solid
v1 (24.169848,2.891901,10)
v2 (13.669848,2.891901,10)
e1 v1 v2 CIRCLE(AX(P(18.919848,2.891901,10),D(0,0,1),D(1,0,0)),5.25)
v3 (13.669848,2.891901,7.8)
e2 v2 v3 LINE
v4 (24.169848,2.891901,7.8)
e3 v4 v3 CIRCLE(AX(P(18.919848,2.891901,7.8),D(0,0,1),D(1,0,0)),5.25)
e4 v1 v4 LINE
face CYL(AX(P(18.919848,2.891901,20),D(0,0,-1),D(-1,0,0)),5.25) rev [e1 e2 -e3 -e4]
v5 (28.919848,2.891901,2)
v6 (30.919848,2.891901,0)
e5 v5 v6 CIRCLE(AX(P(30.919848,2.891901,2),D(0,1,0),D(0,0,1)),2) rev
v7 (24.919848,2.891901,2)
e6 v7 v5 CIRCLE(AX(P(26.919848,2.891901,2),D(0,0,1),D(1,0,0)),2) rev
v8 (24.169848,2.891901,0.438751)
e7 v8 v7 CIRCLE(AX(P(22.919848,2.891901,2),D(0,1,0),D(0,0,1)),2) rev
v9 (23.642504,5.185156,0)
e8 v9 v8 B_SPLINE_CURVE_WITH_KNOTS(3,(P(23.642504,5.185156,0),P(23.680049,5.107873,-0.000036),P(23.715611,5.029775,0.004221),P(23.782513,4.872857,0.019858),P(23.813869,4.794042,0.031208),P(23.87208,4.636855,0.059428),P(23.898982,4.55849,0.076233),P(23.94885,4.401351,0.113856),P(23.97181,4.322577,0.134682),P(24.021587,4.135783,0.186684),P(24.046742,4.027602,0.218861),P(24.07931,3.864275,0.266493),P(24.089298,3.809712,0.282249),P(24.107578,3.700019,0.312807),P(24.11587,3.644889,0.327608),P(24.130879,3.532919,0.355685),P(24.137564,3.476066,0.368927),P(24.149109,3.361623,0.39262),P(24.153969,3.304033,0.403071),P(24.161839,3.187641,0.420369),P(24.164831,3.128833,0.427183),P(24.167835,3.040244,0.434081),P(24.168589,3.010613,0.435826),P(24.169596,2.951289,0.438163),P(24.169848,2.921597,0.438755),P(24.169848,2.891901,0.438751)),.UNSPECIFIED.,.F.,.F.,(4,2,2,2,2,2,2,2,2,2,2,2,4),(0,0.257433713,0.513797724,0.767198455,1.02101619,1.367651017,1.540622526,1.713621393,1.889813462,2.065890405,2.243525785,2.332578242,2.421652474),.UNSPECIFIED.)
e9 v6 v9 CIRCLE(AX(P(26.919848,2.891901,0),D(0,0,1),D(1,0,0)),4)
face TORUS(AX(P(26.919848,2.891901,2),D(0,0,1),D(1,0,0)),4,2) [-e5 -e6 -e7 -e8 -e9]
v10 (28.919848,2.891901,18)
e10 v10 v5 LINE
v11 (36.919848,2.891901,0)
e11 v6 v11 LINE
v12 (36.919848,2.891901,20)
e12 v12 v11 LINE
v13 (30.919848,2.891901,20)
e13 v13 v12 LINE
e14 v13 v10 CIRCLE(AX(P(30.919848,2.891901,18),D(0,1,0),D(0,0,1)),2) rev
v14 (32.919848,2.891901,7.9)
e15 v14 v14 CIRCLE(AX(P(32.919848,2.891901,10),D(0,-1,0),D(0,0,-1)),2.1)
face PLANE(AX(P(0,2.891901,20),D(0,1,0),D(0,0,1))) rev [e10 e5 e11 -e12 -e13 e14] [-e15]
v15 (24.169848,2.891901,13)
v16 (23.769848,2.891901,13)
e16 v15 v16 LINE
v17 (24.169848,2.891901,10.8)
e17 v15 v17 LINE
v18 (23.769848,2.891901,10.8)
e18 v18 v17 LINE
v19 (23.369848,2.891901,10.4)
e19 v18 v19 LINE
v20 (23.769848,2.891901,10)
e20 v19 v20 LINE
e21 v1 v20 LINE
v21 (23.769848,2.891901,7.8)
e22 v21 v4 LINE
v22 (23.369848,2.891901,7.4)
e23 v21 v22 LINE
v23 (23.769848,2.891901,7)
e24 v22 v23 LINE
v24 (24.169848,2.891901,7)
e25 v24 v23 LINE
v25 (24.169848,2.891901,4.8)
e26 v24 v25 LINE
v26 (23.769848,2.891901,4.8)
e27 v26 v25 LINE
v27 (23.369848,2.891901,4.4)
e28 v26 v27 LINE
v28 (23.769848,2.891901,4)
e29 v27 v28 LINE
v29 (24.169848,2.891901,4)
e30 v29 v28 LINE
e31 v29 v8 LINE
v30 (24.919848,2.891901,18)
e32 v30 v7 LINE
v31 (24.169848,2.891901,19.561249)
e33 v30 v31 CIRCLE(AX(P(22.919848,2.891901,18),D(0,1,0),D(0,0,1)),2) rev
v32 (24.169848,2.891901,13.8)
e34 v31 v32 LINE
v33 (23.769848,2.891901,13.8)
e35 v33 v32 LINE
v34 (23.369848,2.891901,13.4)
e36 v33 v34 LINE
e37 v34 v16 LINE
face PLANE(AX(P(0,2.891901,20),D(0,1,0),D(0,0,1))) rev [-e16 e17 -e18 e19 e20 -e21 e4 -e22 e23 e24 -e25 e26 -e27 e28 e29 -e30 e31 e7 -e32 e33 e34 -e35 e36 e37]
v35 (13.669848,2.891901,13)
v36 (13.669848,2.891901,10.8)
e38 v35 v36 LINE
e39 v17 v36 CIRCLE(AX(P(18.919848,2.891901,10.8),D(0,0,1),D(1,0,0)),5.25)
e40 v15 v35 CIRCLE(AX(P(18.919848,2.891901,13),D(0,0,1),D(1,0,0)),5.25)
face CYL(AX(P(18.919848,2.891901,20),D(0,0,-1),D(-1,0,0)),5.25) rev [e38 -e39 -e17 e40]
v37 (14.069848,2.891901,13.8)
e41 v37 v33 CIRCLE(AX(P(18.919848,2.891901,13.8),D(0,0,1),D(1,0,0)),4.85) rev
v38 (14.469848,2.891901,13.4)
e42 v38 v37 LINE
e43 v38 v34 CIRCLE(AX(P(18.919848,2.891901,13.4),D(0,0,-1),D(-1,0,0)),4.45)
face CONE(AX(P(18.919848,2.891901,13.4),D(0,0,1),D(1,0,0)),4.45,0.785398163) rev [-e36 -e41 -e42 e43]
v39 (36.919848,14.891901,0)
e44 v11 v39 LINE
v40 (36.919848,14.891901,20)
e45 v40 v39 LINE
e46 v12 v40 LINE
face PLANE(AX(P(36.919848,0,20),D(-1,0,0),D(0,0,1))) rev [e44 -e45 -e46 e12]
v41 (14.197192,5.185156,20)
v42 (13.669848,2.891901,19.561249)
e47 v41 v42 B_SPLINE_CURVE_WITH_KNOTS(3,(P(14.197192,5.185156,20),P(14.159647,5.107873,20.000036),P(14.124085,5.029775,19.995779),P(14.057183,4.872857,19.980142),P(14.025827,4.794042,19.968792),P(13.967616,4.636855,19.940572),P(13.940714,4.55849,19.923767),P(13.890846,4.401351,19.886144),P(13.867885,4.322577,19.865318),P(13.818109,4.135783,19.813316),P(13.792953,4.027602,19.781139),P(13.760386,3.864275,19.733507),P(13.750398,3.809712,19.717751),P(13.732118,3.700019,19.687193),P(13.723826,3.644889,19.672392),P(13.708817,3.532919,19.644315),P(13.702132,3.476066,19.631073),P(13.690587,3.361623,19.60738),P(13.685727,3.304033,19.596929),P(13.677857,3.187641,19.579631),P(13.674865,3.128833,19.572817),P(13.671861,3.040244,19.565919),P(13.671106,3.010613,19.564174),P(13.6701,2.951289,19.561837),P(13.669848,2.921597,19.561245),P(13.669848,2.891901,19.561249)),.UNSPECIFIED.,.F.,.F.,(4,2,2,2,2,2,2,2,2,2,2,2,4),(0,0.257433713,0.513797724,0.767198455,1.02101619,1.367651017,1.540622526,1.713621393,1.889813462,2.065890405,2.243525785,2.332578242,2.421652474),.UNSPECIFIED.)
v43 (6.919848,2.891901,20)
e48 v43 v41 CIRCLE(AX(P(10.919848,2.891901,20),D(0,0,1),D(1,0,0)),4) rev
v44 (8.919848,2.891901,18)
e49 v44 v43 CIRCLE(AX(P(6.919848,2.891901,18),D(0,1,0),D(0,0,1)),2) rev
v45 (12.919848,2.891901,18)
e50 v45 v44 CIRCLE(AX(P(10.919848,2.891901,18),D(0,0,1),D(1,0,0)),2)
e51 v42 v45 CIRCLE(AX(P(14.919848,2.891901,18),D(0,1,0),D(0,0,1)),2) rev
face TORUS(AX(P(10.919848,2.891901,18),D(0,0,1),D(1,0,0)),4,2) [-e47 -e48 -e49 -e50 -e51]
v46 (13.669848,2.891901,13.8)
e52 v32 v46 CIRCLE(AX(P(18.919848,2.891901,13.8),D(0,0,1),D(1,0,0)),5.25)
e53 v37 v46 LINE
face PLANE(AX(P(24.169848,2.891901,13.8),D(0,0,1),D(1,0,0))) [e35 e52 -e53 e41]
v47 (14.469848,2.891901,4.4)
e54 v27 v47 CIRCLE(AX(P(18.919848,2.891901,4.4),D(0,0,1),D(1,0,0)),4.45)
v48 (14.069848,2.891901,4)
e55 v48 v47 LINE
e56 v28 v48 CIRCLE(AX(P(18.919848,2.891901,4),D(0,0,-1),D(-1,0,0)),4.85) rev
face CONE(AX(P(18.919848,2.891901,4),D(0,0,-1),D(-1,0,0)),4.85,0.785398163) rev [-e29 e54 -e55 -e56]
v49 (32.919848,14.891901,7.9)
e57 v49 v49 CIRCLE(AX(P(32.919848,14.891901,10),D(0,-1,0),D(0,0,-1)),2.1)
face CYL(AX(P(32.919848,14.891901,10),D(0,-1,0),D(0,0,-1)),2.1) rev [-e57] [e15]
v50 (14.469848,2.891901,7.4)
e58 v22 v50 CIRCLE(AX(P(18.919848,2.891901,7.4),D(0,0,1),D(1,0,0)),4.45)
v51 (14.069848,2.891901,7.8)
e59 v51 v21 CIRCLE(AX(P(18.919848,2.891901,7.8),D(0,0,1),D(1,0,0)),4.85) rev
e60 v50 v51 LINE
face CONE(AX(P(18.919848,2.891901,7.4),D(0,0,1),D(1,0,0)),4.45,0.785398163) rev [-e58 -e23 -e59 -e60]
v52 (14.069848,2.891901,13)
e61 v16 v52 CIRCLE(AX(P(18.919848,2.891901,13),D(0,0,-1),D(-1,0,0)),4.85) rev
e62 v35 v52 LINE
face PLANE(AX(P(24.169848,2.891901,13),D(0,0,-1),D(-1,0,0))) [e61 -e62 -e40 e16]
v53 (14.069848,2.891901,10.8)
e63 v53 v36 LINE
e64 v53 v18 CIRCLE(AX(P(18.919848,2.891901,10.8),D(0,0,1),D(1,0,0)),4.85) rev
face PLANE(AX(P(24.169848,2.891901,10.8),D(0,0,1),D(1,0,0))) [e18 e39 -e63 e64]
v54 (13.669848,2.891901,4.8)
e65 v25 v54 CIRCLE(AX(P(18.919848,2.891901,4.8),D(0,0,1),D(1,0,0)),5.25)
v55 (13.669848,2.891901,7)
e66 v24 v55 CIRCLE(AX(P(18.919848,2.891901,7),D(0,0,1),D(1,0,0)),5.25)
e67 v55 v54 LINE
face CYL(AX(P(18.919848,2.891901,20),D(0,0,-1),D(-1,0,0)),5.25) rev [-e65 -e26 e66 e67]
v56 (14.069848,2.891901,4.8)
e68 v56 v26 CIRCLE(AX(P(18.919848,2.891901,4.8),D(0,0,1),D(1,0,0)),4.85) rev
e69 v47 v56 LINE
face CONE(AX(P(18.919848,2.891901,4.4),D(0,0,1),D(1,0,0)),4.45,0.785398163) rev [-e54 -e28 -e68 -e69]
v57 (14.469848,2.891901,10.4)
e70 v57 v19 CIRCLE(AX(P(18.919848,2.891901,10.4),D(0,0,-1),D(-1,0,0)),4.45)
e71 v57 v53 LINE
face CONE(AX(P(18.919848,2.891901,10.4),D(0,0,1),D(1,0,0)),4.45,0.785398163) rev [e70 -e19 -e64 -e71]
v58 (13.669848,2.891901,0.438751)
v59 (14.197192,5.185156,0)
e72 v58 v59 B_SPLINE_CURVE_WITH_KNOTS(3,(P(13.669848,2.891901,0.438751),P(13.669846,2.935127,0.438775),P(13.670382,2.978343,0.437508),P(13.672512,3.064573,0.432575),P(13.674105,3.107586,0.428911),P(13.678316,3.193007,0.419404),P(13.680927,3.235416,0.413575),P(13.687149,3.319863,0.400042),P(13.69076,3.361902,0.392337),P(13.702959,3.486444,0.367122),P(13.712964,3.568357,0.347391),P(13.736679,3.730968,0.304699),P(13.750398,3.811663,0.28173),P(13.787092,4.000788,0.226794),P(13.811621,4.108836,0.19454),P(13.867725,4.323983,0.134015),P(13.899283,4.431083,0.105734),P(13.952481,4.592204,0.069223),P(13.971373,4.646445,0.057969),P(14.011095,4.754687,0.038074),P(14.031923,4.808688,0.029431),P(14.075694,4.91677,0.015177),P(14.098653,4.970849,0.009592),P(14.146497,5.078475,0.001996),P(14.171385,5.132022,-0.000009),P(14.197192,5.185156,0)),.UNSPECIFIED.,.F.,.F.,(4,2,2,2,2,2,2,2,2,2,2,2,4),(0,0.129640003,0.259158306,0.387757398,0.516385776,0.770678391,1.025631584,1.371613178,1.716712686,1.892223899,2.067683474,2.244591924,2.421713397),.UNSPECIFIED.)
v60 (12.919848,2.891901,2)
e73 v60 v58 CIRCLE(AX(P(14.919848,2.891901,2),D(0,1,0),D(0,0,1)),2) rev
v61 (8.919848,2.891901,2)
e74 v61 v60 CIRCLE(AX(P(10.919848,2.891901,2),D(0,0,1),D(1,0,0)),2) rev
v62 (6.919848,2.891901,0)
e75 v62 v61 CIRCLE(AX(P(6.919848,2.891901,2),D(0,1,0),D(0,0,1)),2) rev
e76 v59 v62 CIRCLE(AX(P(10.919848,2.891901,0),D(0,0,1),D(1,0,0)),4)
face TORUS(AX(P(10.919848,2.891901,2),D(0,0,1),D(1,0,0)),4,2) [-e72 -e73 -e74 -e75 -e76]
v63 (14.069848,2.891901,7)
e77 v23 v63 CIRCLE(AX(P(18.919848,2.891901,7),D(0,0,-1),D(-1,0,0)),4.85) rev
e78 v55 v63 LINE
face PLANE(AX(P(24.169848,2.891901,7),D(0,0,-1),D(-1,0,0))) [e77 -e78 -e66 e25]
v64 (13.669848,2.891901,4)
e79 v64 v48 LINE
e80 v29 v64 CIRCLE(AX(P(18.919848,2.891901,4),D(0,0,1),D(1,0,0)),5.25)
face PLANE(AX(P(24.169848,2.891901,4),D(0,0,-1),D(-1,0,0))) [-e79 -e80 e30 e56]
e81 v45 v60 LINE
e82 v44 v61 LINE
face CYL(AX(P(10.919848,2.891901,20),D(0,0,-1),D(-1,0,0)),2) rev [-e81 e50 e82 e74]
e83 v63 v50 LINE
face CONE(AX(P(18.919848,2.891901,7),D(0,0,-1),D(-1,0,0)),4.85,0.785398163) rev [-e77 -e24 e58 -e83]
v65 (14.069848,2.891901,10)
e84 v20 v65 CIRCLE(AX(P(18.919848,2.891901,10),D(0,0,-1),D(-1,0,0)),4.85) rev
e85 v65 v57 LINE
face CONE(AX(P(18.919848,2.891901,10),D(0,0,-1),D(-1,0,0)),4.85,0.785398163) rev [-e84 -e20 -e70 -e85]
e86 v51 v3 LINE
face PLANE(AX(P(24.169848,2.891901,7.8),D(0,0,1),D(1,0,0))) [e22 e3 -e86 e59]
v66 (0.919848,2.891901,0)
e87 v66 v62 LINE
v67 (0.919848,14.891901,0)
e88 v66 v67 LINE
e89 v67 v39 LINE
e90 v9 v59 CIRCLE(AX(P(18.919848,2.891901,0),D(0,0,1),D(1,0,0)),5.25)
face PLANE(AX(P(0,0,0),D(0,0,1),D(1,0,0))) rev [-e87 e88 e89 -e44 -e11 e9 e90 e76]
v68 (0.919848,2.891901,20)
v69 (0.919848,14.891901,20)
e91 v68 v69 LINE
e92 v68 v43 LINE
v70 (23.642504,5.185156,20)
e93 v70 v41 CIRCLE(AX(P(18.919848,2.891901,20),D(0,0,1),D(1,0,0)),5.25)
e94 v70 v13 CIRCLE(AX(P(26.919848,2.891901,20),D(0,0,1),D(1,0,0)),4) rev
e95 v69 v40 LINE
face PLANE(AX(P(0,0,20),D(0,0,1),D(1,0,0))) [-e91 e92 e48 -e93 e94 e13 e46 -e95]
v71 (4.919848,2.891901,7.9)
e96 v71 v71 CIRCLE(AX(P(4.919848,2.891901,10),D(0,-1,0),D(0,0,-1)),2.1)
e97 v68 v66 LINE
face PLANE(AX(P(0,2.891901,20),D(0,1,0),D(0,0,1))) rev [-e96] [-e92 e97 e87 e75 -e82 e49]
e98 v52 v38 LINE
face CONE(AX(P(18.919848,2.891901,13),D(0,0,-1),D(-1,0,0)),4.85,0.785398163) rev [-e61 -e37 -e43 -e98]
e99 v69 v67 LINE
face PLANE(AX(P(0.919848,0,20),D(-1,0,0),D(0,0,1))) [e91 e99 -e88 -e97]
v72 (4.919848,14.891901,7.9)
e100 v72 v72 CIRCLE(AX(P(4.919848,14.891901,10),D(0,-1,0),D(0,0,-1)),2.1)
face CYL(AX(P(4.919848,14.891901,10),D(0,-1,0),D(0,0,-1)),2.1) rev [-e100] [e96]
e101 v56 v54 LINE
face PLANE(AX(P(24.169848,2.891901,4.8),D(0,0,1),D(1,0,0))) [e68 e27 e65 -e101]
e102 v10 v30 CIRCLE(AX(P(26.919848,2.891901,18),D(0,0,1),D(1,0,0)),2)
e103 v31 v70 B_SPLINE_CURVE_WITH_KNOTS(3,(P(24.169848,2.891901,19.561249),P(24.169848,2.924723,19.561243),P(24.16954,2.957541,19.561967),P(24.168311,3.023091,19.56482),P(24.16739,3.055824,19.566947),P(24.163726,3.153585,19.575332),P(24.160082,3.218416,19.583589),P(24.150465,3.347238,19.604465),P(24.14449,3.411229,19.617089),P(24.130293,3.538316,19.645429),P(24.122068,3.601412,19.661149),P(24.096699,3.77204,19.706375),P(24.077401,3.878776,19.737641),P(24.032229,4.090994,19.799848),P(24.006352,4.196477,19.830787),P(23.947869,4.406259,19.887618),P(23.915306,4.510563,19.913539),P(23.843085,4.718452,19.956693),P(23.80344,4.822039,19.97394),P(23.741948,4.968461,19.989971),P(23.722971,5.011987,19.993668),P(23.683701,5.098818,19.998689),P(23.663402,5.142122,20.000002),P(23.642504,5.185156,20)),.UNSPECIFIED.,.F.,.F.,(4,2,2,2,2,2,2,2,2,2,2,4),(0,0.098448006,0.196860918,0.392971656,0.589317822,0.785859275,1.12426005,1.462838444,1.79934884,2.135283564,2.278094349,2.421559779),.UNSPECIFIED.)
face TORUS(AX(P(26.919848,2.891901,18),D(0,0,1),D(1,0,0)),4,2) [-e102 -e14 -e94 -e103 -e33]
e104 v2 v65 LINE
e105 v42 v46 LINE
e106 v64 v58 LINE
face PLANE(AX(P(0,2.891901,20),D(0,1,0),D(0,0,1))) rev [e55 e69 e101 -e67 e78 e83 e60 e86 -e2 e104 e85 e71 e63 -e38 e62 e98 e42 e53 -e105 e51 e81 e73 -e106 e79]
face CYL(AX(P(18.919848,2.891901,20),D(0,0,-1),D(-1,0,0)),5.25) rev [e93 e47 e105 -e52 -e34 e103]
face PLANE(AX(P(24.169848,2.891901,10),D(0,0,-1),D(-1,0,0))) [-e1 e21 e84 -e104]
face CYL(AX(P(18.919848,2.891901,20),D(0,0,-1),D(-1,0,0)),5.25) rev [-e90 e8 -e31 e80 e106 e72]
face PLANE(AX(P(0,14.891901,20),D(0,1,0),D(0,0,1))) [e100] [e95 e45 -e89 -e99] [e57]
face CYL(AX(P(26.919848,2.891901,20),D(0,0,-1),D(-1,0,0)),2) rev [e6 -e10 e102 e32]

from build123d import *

# Parameters (mm, degrees)
BOSS_EXTRUDE1_DEPTH = 20
SKETCH2_W           = 0.8000000000000007
SKETCH2_H           = 0.7999999999999989
SKETCH2_H_2         = 0.8000000000000007
CHAMFER1_SIZE       = 0.4
FILLET2_R           = 2
SKETCH3_R           = 2.100000000000004
SKETCH3_R_2         = 2.100000000000001
CUT_EXTRUDE1_DEPTH  = 44.67007193971907


# Some blends are built 0.0001 mm under size
with BuildPart() as part:
    # Sketch1 → Boss-Extrude1 (new body)
    with BuildSketch(Plane.XY):
        with BuildLine():
            Line((0.9198479389646088, 14.89190109356241), (0.9198479389646088, 2.89190109356241))
            Line((0.9198479389646081, 2.89190109356241), (8.919847938964608, 2.89190109356241))
            ThreePointArc((8.919847938964608, 2.8919010935624105), (10.919847938964608, 4.89190109356241), (12.919847938964608, 2.89190109356241))
            Line((12.919847938964608, 2.89190109356241), (13.669847938964606, 2.89190109356241))
            ThreePointArc((13.669847938964608, 2.8919010935624114), (18.919847938964608, 8.14190109356241), (24.169847938964608, 2.89190109356241))
            Line((24.169847938964608, 2.89190109356241), (24.919847938964608, 2.89190109356241))
            ThreePointArc((24.919847938964608, 2.8919010935624105), (26.919847938964608, 4.891901093562406), (28.919847938964608, 2.89190109356241))
            Line((28.919847938964605, 2.89190109356241), (36.91984793896461, 2.89190109356241))
            Line((36.91984793896461, 2.89190109356241), (36.91984793896461, 14.89190109356241))
            Line((36.91984793896461, 14.89190109356241), (0.9198479389646088, 14.89190109356241))
        make_face()
    extrude(amount=BOSS_EXTRUDE1_DEPTH)

    # Sweep2: sweep along a curve in space
    with BuildLine() as sweep2_path:
        ThreePointArc((24.169847938964608, 2.89190109356241, 20), (22.632158540193984, 6.604211694791784, 20), (18.919847938964608, 8.141901093562412, 20))
        ThreePointArc((18.919847938964608, 8.141901093562412, 20), (15.207537337735232, 6.604211694791786, 20), (13.669847938964606, 2.89190109356241, 20))
    # Sketch2 → Sweep2 (sweep)
    with BuildSketch(Plane.XZ.offset(-2.89190109356241)):
        with Locations((14.069847938964607, 13.400000000000006)):
            Rectangle(SKETCH2_W, SKETCH2_H)
        with Locations((14.069847938964607, 10.400000000000004)):
            Rectangle(SKETCH2_W, SKETCH2_H_2)
        with Locations((14.069847938964607, 7.400000000000003)):
            Rectangle(SKETCH2_W, SKETCH2_H_2)
        Polygon((13.669847938964608, 4.8000000000000025), (14.469847938964607, 4.8000000000000025), (14.469847938964609, 4.000000000000002), (13.669847938964608, 4.000000000000002), align=None)
    sweep(path=sweep2_path.line)

    # Chamfer1
    chamfer1_edges = [part.edges().sort_by_distance(p)[0] for p in [
        (18.919847938964608, 7.341901093562408, 4.000000000000002),
        (18.919847938964608, 7.341901093562411, 4.8000000000000025),
        (18.919847938964608, 7.341901093562411, 7.0000000000000036),
        (18.919847938964608, 7.341901093562413, 7.800000000000004),
        (18.919847938964608, 7.341901093562413, 13.800000000000004),
        (18.919847938964608, 7.341901093562411, 13.000000000000005),
        (18.919847938964608, 7.341901093562413, 10.800000000000004),
        (18.919847938964608, 7.341901093562411, 10.000000000000004),
    ]]
    chamfer(chamfer1_edges, length=CHAMFER1_SIZE - 0.0001)  # a hair under: the kernel refuses the full size

    # Fillet2
    # the kernel refuses this fillet: 2 mm, written as the material it takes off along each edge
    with BuildSketch(Plane(origin=(10.919847938964608, 2.89190109356241, 0), x_dir=(-0.003141587485879782, -0.9999950652018582, 0), z_dir=(0.9999950652018582, -0.003141587485879782, 0))) as fillet2_piece_1:
        with BuildLine():
            CenterArc((2 + FILLET2_R, -FILLET2_R), FILLET2_R, 89.99999999999997, 90)
            Line((2 + FILLET2_R, 2.2e-16), (2, 0))
            Line((2, 0), (2, -FILLET2_R))
        make_face()
    revolve(axis=Axis((10.919847938964608, 2.89190109356241, 0), (0, 0, -1)), revolution_arc=359.64000000000004, mode=Mode.SUBTRACT)
    with BuildSketch(Plane(origin=(26.919847938964608, 2.8919010935624057, 0), x_dir=(-0.003141587485879782, -0.9999950652018582, 0), z_dir=(0.9999950652018582, -0.003141587485879782, 0))) as fillet2_piece_2:
        with BuildLine():
            CenterArc((2.000000000000005 + FILLET2_R, -FILLET2_R), FILLET2_R, 90, 90)
            Line((2.000000000000005, -FILLET2_R), (2.000000000000005, 0))
            Line((2.000000000000005, 0), (2.000000000000005 + FILLET2_R, 0))
        make_face()
    revolve(axis=Axis((26.919847938964608, 2.8919010935624057, 0), (0, 0, -1)), revolution_arc=359.64, mode=Mode.SUBTRACT)
    with BuildSketch(Plane(origin=(10.919847938964608, 2.89190109356241, 20), x_dir=(-0.003141587485879782, -0.9999950652018582, 0), z_dir=(0.9999950652018582, -0.003141587485879782, 0))) as fillet2_piece_3:
        with BuildLine():
            CenterArc((2.0000000000000058 + FILLET2_R, FILLET2_R), FILLET2_R, 180, 90)
            Line((2.0000000000000058, FILLET2_R), (2.0000000000000058, 0))
            Line((2.0000000000000058, 0), (2.0000000000000058 + FILLET2_R, 0))
        make_face()
    revolve(axis=Axis((10.919847938964608, 2.89190109356241, 20), (0, 0, -1)), revolution_arc=359.64000000000004, mode=Mode.SUBTRACT)
    with BuildSketch(Plane(origin=(26.919847938964608, 2.8919010935624057, 20), x_dir=(-0.003141587485879782, -0.9999950652018582, 0), z_dir=(0.9999950652018582, -0.003141587485879782, 0))) as fillet2_piece_4:
        with BuildLine():
            CenterArc((2.000000000000005 + FILLET2_R, FILLET2_R), FILLET2_R, 180, 90)
            Line((2.000000000000005, FILLET2_R), (2.000000000000005, 0))
            Line((2.000000000000005, 0), (2.000000000000005 + FILLET2_R, 0))
        make_face()
    revolve(axis=Axis((26.919847938964608, 2.8919010935624057, 20), (0, 0, -1)), revolution_arc=359.64, mode=Mode.SUBTRACT)

    # Sketch3 → Cut-Extrude1 (cut, through all)
    with BuildSketch(Plane.XZ.offset(-2.89190109356241)):
        with Locations(Location((32.9198479389646, 10, 0), (0, 0, 270))):
            Circle(SKETCH3_R)
        with Locations(Location((4.919847938964609, 10, 0), (0, 0, 270))):
            Circle(SKETCH3_R_2)
    extrude(amount=-CUT_EXTRUDE1_DEPTH, mode=Mode.SUBTRACT)


solid = part.part
